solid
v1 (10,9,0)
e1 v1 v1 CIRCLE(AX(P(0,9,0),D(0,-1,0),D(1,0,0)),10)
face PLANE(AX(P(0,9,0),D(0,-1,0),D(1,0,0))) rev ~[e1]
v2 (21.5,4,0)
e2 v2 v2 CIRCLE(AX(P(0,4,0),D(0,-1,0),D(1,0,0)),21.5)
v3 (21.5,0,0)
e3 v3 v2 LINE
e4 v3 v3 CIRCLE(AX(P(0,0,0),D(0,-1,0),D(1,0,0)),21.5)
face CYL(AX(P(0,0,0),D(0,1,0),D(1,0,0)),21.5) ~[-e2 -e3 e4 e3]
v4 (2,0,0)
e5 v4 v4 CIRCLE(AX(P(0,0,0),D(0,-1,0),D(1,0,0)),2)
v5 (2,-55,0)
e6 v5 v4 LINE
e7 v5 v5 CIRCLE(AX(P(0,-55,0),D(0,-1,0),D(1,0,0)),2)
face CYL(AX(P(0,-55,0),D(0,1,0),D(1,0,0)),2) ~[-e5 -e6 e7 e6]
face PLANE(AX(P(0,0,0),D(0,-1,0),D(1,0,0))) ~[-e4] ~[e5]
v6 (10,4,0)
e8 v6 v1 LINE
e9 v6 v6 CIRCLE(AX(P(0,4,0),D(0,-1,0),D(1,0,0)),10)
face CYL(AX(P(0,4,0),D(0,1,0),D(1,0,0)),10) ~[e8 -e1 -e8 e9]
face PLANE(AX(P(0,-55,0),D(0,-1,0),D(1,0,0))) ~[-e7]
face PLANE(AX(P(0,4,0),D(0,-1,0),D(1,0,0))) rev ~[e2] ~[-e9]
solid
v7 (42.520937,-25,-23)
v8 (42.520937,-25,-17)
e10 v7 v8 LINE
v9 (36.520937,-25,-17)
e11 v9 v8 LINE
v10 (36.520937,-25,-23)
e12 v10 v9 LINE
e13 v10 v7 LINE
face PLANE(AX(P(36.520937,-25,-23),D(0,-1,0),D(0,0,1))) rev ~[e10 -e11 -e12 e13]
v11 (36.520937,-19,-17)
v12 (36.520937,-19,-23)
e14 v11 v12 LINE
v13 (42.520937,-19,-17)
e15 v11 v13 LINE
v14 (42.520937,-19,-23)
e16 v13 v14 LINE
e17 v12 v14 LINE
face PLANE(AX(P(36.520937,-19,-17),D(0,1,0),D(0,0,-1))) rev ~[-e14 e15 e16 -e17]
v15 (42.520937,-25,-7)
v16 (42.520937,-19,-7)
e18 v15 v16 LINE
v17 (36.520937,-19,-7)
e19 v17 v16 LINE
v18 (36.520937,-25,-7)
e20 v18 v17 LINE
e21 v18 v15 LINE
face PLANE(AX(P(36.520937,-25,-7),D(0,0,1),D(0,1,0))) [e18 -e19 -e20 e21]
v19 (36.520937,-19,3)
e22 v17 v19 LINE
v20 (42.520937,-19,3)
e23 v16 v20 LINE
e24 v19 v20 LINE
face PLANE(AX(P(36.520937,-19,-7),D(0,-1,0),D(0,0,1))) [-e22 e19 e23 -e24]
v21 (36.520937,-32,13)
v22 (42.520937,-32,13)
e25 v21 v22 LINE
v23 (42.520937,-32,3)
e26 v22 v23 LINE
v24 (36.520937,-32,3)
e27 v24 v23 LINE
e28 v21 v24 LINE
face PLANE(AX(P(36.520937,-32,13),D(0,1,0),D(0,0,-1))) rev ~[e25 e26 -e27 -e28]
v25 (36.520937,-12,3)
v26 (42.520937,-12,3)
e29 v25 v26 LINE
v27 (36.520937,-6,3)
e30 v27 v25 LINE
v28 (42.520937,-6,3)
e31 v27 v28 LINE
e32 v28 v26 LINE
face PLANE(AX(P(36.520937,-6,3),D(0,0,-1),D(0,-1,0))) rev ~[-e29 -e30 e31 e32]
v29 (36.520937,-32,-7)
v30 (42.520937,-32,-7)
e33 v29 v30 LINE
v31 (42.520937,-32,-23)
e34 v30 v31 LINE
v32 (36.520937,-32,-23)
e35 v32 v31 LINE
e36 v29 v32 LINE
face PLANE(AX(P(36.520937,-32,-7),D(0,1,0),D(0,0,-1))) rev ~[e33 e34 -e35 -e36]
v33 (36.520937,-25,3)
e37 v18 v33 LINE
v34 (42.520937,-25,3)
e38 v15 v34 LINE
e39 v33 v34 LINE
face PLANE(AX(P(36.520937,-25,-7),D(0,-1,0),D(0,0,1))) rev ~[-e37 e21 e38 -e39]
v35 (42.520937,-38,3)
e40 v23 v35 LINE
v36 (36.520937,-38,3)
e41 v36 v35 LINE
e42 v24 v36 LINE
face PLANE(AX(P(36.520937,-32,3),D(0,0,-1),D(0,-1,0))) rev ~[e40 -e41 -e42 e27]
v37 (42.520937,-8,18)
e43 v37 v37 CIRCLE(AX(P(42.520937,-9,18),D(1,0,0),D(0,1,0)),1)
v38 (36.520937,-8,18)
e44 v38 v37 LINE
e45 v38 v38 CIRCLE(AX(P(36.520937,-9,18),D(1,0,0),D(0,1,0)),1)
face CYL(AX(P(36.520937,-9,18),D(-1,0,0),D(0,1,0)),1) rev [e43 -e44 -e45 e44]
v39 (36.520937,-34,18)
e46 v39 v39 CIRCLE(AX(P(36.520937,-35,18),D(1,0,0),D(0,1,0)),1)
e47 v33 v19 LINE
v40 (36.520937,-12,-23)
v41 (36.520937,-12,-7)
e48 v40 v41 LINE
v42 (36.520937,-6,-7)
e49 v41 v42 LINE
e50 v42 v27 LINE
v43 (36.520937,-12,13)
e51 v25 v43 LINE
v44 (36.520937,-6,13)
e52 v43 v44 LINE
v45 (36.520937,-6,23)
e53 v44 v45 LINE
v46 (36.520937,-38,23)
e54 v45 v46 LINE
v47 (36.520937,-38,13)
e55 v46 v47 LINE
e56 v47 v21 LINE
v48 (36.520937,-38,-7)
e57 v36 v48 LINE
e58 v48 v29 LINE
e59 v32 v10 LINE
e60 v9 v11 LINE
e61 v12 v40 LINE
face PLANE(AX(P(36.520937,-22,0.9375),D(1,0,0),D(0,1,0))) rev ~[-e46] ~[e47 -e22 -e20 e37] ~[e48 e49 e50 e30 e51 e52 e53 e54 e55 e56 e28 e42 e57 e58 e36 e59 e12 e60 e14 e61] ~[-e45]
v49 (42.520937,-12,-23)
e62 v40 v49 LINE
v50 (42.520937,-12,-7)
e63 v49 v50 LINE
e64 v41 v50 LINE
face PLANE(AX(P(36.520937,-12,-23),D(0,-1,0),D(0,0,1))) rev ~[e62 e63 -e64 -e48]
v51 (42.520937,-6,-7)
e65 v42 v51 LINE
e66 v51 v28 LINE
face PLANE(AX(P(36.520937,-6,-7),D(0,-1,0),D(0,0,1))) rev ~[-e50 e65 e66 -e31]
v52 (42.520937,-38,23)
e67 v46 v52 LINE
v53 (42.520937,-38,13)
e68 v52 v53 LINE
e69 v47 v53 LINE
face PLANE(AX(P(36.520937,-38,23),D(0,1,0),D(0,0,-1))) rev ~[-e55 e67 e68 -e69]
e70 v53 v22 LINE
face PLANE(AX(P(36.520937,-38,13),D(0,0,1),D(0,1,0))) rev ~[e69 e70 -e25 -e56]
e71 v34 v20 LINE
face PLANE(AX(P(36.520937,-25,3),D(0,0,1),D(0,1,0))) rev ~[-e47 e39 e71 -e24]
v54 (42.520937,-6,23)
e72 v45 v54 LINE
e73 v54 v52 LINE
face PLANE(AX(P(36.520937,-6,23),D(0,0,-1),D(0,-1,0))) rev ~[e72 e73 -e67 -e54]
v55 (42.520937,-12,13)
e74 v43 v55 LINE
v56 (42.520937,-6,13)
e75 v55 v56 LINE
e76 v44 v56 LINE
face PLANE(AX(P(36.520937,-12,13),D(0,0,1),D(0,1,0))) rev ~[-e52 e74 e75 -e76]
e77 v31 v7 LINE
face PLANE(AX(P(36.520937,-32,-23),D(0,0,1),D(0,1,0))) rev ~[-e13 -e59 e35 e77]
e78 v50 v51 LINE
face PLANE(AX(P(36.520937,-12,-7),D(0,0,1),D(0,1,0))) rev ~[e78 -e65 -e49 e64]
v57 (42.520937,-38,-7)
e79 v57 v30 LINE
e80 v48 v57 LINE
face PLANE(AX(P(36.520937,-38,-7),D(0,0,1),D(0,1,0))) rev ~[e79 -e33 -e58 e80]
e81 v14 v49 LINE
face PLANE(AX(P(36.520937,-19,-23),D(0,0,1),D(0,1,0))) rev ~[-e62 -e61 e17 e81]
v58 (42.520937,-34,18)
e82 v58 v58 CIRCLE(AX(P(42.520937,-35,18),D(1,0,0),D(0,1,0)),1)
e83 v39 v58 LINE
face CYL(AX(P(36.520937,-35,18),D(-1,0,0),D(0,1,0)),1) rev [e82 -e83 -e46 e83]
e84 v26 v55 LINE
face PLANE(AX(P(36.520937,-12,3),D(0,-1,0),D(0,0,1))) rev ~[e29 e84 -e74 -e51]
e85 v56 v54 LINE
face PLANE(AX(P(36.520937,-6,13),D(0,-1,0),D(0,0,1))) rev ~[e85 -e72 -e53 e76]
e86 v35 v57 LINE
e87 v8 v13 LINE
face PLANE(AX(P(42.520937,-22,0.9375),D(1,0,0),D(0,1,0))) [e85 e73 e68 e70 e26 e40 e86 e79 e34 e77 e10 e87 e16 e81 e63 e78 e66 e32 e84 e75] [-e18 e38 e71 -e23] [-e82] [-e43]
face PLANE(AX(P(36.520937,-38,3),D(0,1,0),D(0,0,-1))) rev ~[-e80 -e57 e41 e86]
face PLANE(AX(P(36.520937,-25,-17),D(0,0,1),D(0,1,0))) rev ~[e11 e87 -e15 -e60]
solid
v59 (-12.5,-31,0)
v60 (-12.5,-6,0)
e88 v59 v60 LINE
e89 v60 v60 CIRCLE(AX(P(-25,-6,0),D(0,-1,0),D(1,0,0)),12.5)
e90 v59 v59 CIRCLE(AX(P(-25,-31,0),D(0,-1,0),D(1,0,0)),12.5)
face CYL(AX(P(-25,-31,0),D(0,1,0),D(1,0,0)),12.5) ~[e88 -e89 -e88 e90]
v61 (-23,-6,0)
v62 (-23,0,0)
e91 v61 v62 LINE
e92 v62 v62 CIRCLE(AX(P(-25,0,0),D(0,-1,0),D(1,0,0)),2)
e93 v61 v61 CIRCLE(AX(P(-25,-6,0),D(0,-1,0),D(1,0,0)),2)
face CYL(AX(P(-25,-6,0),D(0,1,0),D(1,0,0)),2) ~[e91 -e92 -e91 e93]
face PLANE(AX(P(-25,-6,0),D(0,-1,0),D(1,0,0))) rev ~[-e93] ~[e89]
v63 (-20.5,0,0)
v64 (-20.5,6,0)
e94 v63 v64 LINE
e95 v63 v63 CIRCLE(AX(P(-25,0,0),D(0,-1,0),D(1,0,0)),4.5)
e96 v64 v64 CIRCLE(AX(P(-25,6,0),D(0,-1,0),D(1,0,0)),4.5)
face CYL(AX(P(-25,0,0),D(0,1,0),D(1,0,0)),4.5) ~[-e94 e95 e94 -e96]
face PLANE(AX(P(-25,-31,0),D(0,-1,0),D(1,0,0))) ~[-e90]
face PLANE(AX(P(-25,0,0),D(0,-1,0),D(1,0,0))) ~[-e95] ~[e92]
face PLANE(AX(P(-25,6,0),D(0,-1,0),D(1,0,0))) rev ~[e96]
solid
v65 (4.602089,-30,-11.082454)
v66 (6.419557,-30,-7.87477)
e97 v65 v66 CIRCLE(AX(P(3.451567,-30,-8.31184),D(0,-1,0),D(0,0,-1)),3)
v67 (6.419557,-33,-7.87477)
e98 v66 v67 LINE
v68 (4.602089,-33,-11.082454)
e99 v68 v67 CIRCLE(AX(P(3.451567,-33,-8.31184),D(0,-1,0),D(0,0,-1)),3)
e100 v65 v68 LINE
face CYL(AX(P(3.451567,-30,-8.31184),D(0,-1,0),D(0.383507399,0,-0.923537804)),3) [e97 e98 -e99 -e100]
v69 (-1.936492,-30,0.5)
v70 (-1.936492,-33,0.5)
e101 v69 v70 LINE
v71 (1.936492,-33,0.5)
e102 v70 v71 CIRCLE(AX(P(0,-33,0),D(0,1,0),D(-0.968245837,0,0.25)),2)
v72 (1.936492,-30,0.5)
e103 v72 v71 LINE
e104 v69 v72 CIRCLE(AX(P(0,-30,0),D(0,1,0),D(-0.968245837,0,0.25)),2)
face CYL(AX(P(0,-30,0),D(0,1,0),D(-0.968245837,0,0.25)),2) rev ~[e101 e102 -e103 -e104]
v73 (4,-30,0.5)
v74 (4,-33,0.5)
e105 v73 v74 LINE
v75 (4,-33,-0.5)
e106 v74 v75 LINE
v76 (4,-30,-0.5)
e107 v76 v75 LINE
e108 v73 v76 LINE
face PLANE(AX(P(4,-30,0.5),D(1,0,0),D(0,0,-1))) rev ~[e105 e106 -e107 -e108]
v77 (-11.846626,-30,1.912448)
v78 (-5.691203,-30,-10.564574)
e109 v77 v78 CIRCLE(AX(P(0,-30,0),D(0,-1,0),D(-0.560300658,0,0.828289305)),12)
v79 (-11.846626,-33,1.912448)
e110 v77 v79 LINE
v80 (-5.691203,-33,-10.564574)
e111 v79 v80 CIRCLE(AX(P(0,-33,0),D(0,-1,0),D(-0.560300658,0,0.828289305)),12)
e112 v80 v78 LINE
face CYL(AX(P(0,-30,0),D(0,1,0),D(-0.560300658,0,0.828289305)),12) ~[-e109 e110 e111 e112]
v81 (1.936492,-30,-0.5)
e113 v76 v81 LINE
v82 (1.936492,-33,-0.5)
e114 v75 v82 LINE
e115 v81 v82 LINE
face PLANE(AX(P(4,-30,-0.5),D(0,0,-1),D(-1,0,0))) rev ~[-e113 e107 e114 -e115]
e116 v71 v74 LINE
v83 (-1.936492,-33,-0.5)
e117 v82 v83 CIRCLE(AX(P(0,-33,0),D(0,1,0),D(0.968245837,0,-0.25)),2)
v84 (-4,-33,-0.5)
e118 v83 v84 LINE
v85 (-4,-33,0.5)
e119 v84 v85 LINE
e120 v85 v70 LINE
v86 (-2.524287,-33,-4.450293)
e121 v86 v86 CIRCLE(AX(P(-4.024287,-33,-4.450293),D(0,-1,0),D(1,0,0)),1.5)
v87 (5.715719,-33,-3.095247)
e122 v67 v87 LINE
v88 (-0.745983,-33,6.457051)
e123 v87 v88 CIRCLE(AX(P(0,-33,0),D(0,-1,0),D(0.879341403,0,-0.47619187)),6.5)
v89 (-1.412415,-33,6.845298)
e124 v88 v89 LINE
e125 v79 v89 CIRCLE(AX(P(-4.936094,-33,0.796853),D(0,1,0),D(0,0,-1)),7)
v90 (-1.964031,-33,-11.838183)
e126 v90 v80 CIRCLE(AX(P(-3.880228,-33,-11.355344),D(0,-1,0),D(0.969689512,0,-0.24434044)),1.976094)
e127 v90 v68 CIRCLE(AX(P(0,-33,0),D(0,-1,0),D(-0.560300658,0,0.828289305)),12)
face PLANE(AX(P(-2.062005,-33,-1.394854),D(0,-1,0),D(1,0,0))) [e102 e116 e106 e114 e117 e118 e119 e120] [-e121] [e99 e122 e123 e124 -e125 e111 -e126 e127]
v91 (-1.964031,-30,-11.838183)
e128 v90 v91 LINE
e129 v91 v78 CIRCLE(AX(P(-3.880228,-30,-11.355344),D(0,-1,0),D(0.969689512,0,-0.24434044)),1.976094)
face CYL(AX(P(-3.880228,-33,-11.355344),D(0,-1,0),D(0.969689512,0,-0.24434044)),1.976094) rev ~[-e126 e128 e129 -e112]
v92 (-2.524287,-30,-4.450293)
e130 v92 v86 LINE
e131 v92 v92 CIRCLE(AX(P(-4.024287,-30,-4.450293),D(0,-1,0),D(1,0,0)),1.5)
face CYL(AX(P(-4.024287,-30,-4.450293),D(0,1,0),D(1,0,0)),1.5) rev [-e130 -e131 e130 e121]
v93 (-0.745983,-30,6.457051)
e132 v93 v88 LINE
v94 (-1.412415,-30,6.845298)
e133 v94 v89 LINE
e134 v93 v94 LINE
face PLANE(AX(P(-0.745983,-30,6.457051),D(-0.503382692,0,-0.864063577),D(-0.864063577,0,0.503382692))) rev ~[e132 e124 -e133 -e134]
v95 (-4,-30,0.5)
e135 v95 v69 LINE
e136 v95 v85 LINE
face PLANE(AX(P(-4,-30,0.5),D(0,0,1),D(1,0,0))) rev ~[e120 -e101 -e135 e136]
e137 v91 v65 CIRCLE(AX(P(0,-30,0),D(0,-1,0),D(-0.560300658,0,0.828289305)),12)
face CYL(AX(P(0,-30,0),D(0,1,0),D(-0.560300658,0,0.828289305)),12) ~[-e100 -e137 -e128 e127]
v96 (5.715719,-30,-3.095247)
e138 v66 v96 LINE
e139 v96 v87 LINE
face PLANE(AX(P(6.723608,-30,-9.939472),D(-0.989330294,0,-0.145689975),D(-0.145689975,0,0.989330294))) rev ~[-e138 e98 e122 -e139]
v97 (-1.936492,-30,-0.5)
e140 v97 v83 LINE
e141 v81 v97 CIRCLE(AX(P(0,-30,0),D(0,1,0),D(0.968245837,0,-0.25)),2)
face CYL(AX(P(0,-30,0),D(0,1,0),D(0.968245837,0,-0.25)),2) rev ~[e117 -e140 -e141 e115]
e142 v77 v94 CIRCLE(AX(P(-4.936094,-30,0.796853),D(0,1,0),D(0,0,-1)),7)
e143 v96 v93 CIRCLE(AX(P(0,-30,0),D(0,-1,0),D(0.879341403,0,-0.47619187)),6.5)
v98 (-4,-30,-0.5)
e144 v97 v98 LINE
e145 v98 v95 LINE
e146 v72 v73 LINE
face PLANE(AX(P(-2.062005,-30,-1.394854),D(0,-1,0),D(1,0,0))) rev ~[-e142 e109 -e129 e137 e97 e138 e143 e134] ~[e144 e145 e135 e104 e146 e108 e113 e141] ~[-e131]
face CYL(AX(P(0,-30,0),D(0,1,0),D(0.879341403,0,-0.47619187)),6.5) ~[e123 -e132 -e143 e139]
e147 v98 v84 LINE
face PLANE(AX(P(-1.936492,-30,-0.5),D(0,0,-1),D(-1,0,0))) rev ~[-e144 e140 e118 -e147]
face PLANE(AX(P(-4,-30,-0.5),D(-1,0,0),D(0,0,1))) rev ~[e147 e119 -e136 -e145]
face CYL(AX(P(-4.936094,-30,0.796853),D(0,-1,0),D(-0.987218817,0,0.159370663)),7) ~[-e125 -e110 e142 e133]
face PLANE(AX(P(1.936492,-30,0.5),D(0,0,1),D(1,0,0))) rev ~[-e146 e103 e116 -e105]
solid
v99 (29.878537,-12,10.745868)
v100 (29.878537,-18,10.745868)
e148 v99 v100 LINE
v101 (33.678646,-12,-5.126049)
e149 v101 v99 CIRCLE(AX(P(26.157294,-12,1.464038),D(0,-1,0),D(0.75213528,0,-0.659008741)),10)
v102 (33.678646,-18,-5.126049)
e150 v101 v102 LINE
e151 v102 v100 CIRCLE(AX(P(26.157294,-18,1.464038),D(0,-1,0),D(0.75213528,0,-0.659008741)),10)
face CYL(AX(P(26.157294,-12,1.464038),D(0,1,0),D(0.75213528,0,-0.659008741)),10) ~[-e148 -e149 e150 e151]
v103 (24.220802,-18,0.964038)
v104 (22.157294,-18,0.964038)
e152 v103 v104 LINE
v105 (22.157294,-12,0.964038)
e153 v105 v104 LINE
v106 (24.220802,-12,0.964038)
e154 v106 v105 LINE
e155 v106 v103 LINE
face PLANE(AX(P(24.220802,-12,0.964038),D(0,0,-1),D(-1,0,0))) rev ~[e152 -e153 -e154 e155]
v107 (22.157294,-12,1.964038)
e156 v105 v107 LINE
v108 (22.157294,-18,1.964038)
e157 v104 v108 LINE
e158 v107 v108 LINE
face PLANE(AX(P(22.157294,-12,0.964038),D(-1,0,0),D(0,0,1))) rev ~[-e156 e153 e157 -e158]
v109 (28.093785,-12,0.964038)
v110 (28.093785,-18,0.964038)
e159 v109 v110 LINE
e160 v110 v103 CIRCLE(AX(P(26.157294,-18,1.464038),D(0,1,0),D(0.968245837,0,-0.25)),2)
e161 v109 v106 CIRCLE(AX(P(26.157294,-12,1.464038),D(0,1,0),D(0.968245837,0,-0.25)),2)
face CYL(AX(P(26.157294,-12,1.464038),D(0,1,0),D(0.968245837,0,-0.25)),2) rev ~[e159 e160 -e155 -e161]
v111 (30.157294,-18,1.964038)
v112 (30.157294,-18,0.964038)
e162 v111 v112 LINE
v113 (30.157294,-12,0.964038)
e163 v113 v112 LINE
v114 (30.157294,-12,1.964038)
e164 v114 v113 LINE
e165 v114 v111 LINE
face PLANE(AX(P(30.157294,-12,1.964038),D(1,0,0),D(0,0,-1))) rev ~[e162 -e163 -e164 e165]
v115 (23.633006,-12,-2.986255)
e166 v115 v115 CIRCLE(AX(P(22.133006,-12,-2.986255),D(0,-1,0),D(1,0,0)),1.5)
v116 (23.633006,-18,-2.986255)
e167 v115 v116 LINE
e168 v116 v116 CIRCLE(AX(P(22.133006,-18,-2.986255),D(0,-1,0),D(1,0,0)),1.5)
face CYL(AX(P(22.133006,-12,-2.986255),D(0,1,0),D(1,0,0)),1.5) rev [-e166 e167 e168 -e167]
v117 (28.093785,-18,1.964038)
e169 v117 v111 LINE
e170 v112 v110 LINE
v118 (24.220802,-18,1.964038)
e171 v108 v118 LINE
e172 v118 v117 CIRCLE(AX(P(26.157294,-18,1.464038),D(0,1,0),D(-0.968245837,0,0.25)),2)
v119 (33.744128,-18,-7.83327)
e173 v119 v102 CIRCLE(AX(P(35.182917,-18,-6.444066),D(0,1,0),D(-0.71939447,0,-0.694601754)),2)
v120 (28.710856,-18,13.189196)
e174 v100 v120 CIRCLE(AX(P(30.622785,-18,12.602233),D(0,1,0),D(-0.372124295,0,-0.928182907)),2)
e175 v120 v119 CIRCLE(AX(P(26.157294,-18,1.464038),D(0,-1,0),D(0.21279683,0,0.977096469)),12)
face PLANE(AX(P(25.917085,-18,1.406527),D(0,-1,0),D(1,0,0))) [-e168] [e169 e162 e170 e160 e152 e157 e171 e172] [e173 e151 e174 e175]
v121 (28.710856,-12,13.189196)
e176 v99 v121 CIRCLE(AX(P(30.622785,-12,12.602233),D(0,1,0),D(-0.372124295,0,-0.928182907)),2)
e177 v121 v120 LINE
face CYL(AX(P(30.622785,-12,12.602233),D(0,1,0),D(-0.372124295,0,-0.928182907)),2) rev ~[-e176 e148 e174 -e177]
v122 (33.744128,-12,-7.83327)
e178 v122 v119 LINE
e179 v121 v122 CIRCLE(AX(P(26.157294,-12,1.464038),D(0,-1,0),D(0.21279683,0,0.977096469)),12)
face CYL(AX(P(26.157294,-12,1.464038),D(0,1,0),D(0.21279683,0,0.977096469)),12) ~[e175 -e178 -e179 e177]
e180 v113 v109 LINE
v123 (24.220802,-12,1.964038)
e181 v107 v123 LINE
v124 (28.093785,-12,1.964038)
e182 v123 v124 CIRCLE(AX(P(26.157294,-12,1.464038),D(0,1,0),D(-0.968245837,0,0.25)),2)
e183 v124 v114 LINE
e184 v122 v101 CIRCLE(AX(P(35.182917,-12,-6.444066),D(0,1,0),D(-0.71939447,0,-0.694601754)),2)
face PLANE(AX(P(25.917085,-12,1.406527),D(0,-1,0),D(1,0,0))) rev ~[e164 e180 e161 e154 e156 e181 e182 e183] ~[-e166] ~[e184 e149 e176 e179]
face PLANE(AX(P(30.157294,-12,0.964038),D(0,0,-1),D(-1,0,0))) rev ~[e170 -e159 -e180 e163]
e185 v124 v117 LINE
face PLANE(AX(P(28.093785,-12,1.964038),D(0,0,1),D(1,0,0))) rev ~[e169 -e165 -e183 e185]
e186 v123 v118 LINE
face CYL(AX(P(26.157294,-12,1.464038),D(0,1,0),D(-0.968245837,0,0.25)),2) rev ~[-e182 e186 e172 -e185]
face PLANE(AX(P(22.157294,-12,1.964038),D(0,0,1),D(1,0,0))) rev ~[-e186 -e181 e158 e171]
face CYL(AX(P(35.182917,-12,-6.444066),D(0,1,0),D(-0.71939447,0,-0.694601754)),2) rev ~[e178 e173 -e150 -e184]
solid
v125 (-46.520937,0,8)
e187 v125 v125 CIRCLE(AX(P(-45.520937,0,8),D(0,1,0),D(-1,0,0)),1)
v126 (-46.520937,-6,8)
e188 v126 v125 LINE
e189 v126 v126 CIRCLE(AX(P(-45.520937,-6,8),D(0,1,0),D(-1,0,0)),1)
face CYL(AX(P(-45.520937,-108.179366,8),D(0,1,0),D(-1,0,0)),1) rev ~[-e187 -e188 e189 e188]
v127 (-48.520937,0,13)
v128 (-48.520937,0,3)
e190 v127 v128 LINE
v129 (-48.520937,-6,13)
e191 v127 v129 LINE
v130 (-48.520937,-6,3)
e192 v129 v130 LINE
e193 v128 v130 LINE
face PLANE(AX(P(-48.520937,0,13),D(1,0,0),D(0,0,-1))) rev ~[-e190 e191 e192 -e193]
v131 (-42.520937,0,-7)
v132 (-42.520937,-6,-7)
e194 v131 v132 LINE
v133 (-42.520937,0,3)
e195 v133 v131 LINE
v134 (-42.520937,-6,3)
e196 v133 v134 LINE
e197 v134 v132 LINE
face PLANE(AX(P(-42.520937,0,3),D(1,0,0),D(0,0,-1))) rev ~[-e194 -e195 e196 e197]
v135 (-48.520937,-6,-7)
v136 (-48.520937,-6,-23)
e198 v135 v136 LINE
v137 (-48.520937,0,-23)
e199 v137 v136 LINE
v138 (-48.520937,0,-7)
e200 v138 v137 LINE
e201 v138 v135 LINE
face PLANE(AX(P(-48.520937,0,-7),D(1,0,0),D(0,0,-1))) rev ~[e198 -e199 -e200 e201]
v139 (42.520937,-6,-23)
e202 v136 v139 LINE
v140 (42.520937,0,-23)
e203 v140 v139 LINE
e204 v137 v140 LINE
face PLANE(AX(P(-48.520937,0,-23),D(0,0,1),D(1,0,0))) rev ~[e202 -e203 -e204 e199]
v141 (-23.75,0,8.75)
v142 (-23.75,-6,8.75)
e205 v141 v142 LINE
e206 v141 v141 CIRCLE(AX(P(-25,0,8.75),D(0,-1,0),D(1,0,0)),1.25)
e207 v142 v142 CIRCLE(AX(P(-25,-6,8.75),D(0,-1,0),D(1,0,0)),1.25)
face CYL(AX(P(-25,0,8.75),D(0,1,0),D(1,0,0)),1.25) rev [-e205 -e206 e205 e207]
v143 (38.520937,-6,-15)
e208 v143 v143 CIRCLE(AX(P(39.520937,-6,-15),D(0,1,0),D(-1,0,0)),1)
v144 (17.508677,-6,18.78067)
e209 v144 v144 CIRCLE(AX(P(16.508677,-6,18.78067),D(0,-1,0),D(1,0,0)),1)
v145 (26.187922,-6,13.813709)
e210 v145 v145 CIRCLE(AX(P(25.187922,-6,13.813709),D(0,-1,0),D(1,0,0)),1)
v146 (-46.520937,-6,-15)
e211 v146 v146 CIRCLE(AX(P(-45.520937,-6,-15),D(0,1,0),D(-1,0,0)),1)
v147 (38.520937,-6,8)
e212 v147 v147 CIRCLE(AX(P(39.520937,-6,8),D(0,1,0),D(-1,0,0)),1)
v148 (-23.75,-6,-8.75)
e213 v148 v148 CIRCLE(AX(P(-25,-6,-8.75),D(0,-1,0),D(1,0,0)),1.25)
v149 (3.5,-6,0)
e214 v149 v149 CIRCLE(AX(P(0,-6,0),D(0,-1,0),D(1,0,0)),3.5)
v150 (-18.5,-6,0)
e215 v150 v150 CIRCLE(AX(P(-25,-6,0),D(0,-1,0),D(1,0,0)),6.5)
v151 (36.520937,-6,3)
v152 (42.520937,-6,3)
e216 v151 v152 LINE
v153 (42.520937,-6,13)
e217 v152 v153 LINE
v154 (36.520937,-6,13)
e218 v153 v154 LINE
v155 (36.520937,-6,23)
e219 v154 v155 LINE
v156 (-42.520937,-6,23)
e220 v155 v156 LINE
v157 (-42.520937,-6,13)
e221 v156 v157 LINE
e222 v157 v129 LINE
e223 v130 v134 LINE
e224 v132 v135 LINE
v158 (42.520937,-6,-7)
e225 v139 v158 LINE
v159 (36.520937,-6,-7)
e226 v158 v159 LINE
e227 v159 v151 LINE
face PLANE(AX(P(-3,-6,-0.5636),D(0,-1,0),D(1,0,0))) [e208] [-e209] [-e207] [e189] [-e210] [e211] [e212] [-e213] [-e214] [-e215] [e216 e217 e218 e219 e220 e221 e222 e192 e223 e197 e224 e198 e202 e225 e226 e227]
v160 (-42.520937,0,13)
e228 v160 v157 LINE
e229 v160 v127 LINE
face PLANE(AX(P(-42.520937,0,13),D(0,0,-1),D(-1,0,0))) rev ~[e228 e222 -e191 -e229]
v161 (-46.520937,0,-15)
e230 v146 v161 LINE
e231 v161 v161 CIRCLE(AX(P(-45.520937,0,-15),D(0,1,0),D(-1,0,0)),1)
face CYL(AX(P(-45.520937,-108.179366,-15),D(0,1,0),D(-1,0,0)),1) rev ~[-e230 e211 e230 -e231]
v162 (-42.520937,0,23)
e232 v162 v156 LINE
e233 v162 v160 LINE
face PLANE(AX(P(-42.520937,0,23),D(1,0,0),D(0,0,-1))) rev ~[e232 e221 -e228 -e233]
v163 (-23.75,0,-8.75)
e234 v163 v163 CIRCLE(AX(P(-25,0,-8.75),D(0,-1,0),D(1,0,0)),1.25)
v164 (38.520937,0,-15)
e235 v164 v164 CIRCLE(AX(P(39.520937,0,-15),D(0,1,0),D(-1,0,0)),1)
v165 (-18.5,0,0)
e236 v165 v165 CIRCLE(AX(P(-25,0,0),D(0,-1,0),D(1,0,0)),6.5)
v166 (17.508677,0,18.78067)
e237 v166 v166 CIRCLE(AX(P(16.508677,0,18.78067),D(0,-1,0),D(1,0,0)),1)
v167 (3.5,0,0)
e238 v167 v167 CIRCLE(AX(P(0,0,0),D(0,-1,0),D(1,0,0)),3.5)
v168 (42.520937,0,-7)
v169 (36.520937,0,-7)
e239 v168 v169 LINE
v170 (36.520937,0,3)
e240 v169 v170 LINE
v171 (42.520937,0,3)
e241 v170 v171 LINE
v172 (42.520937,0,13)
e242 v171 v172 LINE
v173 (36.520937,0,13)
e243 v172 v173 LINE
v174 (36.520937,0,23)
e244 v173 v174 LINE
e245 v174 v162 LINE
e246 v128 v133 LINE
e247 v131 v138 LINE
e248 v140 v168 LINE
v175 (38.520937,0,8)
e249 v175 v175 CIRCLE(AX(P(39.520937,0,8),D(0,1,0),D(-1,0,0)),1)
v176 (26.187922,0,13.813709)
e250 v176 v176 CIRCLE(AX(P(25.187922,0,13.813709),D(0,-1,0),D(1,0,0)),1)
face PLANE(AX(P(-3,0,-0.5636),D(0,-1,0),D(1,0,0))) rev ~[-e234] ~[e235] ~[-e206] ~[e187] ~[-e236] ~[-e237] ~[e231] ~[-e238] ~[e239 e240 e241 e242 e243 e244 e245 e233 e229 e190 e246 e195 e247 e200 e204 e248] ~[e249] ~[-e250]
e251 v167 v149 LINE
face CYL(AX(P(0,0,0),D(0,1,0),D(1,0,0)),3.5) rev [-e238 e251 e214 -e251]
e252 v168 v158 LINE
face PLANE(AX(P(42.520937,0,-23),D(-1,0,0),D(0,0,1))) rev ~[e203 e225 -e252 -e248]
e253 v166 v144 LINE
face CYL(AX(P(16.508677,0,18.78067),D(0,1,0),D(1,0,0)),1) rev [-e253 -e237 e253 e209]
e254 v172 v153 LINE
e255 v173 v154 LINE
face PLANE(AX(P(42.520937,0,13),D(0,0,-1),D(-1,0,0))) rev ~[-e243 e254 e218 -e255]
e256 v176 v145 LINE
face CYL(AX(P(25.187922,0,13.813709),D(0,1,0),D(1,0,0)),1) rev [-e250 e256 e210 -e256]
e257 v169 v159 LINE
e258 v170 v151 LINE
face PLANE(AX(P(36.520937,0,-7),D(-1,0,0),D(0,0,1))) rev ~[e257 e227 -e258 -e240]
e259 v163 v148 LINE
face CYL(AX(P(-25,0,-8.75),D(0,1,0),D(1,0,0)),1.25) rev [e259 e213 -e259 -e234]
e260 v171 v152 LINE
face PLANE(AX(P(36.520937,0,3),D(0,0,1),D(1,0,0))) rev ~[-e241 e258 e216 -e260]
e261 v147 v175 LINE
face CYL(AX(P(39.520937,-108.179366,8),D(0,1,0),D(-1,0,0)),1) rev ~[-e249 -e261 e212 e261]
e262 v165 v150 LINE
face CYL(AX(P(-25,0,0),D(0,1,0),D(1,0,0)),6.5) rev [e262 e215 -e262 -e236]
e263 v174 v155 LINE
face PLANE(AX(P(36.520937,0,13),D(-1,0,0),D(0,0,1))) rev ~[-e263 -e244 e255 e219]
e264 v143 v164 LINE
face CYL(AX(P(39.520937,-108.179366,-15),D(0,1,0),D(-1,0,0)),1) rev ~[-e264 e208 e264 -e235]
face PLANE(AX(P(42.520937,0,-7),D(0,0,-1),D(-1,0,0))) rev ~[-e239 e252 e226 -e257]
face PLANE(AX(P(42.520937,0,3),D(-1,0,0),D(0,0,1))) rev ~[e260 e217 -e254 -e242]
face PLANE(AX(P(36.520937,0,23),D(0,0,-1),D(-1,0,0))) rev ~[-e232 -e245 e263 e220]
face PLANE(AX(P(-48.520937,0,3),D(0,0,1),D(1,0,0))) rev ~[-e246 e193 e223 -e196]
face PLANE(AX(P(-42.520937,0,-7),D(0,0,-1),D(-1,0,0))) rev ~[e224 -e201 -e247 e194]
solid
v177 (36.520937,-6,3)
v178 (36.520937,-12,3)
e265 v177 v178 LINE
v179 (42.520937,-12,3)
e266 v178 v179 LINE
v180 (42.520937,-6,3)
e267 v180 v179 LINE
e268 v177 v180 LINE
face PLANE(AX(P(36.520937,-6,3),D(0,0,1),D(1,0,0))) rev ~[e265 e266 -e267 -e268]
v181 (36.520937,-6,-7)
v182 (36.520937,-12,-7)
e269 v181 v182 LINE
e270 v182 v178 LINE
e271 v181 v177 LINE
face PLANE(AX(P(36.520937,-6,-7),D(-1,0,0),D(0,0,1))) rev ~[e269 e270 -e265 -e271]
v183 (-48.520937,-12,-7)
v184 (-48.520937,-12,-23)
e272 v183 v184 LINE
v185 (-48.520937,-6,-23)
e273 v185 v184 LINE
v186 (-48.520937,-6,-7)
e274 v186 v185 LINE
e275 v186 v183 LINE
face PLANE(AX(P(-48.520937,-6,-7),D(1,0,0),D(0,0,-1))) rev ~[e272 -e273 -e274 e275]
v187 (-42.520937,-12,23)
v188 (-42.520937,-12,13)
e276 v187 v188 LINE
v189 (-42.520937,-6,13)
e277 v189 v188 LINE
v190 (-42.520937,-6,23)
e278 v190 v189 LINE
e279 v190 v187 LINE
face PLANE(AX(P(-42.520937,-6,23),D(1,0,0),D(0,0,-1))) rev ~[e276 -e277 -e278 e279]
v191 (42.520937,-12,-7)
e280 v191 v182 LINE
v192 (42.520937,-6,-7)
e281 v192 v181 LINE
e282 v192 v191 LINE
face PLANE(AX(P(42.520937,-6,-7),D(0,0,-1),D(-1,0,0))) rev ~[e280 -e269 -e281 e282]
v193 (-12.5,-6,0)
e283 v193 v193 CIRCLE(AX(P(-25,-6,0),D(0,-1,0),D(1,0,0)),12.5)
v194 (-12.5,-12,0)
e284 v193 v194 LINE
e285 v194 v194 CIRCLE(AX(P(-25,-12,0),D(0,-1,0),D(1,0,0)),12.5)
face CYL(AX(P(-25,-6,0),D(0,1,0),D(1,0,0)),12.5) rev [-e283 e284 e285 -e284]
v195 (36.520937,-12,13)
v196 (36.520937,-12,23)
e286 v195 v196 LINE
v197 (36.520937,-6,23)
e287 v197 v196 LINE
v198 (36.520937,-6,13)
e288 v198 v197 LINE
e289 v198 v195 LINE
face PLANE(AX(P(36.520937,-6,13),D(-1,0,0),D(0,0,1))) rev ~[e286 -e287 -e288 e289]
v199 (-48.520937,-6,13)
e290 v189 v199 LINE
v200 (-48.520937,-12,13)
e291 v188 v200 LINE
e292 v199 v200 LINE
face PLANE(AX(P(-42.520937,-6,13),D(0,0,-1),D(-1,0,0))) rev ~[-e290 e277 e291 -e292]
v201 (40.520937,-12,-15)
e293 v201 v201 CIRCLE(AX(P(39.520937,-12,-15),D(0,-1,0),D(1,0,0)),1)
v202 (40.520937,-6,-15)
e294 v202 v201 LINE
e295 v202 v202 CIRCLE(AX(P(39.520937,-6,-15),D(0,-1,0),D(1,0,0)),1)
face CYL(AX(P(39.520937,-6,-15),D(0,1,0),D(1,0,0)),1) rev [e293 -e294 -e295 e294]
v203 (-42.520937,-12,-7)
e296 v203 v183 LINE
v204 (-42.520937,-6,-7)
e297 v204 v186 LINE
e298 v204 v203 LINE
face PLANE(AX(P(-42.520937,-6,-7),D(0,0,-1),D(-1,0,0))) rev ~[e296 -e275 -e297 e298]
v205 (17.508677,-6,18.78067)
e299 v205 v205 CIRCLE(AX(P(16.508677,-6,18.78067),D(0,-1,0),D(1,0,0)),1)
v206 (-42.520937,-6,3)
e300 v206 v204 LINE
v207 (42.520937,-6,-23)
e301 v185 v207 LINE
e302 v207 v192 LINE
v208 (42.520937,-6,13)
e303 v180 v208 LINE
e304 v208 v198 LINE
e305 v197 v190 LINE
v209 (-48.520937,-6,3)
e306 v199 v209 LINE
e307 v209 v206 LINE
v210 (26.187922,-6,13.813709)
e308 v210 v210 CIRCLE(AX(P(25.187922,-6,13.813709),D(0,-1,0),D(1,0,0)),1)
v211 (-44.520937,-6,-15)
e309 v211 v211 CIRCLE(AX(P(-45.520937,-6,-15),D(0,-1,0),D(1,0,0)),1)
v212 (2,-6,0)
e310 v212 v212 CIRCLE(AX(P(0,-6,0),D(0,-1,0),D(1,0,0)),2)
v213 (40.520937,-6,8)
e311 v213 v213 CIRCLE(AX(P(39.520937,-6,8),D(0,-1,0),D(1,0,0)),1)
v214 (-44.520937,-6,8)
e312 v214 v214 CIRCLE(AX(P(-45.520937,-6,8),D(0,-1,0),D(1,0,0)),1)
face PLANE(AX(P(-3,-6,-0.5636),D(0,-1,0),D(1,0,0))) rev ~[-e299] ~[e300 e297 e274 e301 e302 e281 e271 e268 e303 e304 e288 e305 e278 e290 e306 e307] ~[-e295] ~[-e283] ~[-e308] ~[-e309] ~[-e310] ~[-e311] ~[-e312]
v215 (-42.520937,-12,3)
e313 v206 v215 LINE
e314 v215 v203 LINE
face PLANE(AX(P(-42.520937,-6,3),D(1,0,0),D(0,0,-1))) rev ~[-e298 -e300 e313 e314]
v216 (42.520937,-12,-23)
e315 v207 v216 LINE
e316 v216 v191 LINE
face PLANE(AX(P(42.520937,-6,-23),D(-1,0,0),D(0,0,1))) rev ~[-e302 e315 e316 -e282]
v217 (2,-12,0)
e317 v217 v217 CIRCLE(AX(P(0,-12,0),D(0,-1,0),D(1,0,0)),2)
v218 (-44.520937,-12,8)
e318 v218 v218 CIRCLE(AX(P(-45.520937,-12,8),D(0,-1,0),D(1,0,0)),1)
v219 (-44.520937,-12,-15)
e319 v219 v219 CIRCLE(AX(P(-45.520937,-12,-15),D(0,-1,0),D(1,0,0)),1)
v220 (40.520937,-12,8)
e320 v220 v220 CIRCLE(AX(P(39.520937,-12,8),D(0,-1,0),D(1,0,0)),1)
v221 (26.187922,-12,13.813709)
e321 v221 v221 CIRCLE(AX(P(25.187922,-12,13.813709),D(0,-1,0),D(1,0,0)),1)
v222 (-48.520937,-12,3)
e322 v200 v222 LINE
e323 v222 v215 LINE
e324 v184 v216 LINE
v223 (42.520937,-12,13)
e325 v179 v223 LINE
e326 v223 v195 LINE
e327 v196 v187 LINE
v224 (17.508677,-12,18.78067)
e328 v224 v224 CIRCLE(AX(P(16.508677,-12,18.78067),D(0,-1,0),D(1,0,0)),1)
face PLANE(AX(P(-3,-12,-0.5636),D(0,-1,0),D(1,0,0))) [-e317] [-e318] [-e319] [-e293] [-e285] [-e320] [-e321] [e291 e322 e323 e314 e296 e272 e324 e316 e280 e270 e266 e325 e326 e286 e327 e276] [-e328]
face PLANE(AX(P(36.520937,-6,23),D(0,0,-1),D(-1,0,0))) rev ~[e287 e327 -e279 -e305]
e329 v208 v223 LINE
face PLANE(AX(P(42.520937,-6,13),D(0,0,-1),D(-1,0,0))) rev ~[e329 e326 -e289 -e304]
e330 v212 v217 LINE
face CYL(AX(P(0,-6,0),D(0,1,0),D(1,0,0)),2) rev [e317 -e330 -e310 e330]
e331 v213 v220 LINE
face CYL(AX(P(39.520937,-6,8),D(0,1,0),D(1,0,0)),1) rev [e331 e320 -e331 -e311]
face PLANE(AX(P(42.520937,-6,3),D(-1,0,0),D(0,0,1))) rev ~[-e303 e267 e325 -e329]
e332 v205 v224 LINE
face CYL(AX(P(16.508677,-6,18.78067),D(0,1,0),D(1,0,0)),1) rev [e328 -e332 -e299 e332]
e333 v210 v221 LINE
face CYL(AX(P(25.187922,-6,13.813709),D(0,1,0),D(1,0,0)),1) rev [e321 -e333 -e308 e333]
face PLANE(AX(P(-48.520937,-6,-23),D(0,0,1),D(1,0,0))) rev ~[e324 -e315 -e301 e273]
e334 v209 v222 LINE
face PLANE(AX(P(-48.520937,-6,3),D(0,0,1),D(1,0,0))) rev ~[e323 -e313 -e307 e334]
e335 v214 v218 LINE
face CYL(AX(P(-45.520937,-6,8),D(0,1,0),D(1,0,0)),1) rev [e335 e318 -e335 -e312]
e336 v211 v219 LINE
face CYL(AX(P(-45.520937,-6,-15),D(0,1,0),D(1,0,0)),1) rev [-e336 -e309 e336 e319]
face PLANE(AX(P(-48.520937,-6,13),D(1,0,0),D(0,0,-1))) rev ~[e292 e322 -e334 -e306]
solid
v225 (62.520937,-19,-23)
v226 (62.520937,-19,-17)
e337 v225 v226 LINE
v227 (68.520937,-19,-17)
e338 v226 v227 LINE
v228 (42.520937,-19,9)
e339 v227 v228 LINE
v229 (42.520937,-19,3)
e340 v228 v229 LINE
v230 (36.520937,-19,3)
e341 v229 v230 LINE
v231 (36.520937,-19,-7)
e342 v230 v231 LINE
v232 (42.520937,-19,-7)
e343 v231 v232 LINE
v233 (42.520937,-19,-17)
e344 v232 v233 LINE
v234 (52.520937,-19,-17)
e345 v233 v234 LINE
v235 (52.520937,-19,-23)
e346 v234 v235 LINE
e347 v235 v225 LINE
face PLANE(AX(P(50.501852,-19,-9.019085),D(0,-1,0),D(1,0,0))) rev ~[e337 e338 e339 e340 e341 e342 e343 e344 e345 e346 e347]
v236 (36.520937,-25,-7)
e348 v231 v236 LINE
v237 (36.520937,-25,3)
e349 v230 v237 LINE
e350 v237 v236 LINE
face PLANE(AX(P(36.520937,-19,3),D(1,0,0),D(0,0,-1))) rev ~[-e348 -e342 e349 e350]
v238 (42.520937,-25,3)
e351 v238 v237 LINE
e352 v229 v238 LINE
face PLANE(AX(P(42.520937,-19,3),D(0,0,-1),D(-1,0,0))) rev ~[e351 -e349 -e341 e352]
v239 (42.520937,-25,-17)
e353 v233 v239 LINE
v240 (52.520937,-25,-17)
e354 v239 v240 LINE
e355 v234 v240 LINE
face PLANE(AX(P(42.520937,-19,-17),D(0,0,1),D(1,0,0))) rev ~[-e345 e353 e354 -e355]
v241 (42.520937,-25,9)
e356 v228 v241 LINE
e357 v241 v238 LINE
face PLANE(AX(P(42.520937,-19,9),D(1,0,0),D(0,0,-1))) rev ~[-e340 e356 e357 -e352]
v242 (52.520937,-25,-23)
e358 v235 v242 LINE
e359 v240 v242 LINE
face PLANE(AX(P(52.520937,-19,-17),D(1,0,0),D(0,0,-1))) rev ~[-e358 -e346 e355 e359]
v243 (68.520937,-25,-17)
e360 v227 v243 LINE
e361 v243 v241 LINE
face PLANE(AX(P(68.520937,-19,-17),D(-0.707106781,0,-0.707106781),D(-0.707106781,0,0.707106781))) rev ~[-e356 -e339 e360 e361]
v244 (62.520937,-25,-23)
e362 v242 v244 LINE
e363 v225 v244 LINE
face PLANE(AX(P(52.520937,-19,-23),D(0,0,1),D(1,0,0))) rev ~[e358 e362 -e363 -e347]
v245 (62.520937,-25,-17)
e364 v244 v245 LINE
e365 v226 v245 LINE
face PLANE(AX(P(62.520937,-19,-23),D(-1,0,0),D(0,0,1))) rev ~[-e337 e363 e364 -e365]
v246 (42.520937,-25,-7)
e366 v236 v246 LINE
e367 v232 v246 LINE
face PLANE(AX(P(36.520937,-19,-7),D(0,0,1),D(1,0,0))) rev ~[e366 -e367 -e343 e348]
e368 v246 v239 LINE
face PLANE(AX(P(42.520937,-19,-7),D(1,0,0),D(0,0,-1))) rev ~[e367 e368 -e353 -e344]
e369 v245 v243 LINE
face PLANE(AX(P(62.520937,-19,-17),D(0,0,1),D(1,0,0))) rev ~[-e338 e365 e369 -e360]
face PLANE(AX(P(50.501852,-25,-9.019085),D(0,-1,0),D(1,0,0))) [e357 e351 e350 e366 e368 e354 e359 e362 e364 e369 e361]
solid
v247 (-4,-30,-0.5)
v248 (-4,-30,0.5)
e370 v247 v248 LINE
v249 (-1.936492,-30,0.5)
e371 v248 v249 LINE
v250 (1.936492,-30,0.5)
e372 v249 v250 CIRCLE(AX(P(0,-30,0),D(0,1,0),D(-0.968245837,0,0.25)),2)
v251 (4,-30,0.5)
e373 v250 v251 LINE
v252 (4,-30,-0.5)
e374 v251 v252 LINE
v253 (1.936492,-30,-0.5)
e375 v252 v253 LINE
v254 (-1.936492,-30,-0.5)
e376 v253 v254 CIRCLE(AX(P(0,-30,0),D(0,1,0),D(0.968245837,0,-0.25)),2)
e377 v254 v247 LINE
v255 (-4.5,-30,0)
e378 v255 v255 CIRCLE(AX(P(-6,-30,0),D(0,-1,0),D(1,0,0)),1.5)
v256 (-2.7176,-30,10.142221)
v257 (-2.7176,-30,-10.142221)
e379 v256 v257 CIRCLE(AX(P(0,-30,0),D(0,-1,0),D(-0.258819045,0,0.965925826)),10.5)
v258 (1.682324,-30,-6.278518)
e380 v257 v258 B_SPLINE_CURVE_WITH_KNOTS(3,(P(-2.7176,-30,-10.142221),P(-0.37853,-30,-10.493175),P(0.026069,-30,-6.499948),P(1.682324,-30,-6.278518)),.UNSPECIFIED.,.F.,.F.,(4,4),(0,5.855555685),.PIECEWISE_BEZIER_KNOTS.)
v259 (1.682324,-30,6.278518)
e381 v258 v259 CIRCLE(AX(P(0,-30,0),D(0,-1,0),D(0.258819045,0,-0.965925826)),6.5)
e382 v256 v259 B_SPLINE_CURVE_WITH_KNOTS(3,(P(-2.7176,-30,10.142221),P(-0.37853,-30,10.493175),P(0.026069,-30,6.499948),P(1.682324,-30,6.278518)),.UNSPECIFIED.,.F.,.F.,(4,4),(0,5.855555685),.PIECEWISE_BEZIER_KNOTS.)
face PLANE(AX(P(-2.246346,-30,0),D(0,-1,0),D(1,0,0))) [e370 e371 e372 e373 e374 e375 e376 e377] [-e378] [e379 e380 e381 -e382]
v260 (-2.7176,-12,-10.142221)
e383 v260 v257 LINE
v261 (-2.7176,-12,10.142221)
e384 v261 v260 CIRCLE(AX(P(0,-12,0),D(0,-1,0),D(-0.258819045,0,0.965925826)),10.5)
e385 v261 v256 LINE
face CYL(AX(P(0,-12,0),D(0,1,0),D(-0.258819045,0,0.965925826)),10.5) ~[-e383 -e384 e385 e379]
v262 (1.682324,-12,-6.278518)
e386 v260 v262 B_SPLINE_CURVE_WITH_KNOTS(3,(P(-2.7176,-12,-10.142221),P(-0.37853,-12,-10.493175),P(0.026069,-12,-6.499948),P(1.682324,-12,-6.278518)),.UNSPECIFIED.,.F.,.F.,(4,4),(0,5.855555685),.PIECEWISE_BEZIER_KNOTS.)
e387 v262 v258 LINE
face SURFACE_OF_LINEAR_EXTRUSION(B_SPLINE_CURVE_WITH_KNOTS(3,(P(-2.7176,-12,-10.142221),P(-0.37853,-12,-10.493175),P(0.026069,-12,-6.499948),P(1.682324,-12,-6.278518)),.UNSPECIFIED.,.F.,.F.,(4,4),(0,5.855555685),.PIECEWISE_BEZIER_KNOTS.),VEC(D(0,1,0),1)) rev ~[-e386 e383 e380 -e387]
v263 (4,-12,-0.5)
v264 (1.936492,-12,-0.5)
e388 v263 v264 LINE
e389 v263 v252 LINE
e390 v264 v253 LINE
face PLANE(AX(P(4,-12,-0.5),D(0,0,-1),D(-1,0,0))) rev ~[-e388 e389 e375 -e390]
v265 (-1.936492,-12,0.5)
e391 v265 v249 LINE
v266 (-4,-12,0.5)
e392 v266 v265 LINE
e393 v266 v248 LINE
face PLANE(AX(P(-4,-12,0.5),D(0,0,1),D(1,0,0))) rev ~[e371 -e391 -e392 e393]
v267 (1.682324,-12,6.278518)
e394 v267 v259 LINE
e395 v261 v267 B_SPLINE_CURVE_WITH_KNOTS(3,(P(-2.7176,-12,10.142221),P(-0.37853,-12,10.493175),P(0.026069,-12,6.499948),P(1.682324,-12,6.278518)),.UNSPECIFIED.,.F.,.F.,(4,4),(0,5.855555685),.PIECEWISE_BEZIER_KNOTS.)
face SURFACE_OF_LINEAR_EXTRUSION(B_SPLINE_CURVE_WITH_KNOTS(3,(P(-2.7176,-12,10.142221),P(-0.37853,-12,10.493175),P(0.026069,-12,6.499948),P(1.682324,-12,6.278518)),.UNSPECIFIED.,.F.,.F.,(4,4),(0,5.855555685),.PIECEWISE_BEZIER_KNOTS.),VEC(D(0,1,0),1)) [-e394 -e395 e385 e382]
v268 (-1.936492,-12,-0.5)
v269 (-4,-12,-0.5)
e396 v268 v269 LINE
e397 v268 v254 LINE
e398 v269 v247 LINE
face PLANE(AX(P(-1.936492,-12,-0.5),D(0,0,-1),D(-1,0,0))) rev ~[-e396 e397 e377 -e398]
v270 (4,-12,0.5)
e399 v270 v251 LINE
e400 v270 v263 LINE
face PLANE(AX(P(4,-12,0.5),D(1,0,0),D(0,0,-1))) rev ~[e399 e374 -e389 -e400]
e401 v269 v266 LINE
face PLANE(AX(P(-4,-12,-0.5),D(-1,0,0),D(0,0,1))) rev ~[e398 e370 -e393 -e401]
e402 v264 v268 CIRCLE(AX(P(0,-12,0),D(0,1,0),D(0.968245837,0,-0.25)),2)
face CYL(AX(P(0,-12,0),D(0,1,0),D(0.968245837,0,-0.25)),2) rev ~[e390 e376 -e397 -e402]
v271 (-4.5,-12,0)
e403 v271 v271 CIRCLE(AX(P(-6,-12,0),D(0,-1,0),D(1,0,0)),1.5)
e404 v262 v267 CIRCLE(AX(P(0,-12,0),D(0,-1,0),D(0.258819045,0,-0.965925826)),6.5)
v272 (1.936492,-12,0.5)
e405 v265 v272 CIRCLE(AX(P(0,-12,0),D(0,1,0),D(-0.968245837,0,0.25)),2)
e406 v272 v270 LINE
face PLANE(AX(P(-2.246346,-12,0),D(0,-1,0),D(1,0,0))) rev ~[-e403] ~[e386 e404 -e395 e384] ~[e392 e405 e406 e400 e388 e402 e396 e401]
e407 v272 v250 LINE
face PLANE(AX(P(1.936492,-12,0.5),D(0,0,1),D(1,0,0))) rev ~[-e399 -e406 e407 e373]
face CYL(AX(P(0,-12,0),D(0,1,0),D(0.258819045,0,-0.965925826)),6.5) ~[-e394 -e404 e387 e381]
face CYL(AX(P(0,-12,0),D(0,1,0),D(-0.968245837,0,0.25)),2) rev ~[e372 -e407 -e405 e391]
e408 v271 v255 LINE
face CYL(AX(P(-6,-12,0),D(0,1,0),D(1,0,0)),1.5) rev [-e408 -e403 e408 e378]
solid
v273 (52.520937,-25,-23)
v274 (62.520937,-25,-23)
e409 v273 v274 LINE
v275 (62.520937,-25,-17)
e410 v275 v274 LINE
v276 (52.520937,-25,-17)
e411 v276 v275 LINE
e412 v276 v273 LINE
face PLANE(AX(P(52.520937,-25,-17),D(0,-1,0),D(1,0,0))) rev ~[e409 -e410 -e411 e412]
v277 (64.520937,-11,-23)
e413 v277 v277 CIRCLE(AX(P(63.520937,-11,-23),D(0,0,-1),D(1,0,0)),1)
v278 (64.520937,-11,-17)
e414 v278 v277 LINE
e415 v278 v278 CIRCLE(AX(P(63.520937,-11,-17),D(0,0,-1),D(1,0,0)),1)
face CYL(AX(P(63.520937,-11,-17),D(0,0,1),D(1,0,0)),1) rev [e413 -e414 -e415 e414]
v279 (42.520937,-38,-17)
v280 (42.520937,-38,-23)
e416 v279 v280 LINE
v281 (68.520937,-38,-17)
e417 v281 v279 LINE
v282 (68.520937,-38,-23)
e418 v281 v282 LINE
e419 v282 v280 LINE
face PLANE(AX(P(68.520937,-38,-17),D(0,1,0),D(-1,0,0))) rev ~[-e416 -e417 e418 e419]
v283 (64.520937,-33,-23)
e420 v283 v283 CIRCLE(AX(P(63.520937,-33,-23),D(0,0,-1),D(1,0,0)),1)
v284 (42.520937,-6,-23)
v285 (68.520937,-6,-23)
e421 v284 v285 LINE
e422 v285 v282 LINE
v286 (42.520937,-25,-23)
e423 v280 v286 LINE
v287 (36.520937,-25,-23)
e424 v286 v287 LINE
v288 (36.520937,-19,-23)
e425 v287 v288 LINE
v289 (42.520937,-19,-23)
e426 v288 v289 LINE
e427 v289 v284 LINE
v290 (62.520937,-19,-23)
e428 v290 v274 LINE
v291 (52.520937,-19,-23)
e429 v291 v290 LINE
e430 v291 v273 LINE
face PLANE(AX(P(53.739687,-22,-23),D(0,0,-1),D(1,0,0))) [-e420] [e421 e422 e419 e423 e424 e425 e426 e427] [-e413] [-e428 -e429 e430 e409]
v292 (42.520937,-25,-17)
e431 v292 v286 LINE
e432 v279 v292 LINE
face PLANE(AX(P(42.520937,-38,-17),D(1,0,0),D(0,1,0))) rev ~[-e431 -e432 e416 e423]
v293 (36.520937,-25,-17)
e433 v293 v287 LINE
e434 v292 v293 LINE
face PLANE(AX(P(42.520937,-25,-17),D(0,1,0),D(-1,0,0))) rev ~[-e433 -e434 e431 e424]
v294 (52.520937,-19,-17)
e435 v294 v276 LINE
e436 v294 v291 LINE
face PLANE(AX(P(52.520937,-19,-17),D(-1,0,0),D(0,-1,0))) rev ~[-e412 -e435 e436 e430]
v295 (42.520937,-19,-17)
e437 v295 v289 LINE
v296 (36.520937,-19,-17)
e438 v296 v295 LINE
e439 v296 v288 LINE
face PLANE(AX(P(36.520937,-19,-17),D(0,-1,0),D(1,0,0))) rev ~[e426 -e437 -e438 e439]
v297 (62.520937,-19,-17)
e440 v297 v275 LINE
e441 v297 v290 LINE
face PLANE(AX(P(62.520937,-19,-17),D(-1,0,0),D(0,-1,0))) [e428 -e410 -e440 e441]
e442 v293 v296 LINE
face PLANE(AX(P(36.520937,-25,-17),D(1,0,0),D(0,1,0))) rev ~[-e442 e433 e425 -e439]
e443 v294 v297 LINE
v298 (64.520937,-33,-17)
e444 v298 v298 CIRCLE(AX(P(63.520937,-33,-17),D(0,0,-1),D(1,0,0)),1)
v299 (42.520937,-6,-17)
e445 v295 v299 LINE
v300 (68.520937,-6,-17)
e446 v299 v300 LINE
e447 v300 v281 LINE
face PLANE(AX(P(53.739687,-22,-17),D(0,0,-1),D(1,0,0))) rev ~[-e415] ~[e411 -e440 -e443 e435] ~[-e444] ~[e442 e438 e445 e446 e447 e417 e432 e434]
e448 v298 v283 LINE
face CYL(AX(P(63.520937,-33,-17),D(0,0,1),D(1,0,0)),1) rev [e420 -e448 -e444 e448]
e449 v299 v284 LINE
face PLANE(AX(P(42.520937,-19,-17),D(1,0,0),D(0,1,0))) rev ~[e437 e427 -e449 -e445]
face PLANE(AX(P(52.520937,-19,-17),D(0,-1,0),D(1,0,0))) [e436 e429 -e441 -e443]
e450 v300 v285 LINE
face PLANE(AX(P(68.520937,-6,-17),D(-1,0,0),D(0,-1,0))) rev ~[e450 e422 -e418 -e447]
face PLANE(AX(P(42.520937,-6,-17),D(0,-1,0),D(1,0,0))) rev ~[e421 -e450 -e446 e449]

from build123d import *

# Parameters (mm, degrees)
F0_R      = 1.25
F0_R_2    = 6.5
F0_R_3    = 3.5
F0_R_4    = 1
F1_DEPTH  = 6
F6_R      = 1
F6_R_2    = 12.5
F6_R_3    = 2
F7_DEPTH  = 6
F8_D      = 2
F9_R      = 1.5
F10_DEPTH = 18
F11_W     = 6
F11_H     = 10
F11_R     = 1
F12_DEPTH = 6
F13_R     = 1
F13_W     = 10
F13_H     = 6
F14_DEPTH = 6
F16_DEPTH = 6
F17_R     = 1.5
F18_DEPTH = 3
F19_R     = 3
F20_R     = 7
F22_DEPTH = 42.001
F23_R     = 1.5
F24_DEPTH = 6


with BuildPart() as f1:
    # F0 (on Front) → F1 (new body)
    with BuildSketch(Plane.XZ):
        Polygon((36.5209371471, 13), (36.5209371471, 23), (-42.5209371471, 23), (-42.5209371471, 13), (-48.5209371471, 13), (-48.5209371471, 3), (-42.5209371471, 3), (-42.5209371471, -7), (-48.5209371471, -7), (-48.5209371471, -23), (42.5209371471, -23), (42.5209371471, -7), (36.5209371471, -7), (36.5209371471, 3), (42.5209371471, 3), (42.5209371471, 13), align=None)
        with Locations((-25, -8.75)):
            Circle(F0_R, mode=Mode.SUBTRACT)
        with Locations((-25, 0)):
            Circle(F0_R_2, mode=Mode.SUBTRACT)
        with Locations((-25, 8.75)):
            Circle(F0_R, mode=Mode.SUBTRACT)
        Circle(F0_R_3, mode=Mode.SUBTRACT)
        with Locations((16.5086770278, 18.7806704564)):
            Circle(F0_R_4, mode=Mode.SUBTRACT)
        with Locations((25.1879223108, 13.8137094824)):
            Circle(F0_R_4, mode=Mode.SUBTRACT)
    extrude(amount=F1_DEPTH)

    # F8 (through all)
    with Locations(Plane.XZ.offset(6)):
        with Locations((39.5209371471, 8), (39.5209371471, -15), (-45.5209371471, -15), (-45.5209371471, 8)):
            Hole(F8_D / 2)


with BuildPart() as f3:
    # F2 (on Top) → F3 (revolve)
    with BuildSketch(Plane.XY):
        Polygon((10, 9), (0, 9), (0, -55), (2, -55), (2, 0), (21.5, 0), (21.5, 4), (10, 4), align=None)
    revolve(axis=Axis((0, -23, 0), (0, -1, 0)))


with BuildPart() as f5:
    # F4 (on Top) → F5 (revolve)
    with BuildSketch(Plane.XY):
        Polygon((-25, -31), (-12.5, -31), (-12.5, -6), (-23, -6), (-23, 0), (-20.5, 0), (-20.5, 6), (-25, 6), align=None)
    revolve(axis=Axis((-25, -12.5, 0), (0, -1, 0)))


with BuildPart() as f7:
    # F6 (on face) → F7 (new body)
    with BuildSketch(Plane.XZ.offset(6)):
        Polygon((36.5209371471, 13), (36.5209371471, 23), (-42.5209371471, 23), (-42.5209371471, 13), (-48.5209371471, 13), (-48.5209371471, 3), (-42.5209371471, 3), (-42.5209371471, -7), (-48.5209371471, -7), (-48.5209371471, -23), (42.5209371471, -23), (42.5209371471, -7), (36.5209371471, -7), (36.5209371471, 3), (42.5209371471, 3), (42.5209371471, 13), align=None)
        with Locations((-45.5209371471, -15)):
            Circle(F6_R, mode=Mode.SUBTRACT)
        with Locations((39.5209371471, -15)):
            Circle(F6_R, mode=Mode.SUBTRACT)
        with Locations((-45.5209371471, 8)):
            Circle(F6_R, mode=Mode.SUBTRACT)
        with Locations((-25, 0)):
            Circle(F6_R_2, mode=Mode.SUBTRACT)
        Circle(F6_R_3, mode=Mode.SUBTRACT)
        with Locations((39.5209371471, 8)):
            Circle(F6_R, mode=Mode.SUBTRACT)
        with Locations((16.5086770278, 18.7806704564)):
            Circle(F6_R, mode=Mode.SUBTRACT)
        with Locations((25.1879223108, 13.8137094824)):
            Circle(F6_R, mode=Mode.SUBTRACT)
    extrude(amount=F7_DEPTH)


with BuildPart() as f10:
    # F9 (on face) → F10 (new body)
    with BuildSketch(Plane.XZ.offset(12)):
        with BuildLine():
            add(Edge.make_bspline(
                [(-2.7175999736, -10.142221176), (-0.3785296212, -10.493174702), (0.0260690487, -6.4999477232), (1.6823237932, -6.2785178709)],
                knots=[0, 0, 0, 0, 5.8555556853, 5.8555556853, 5.8555556853, 5.8555556853], degree=3))
            ThreePointArc((1.6823237932, -6.2785178709), (6.5, 0), (1.6823237932, 6.2785178709))
            add(Edge.make_bspline(
                [(-2.7175999736, 10.142221176), (-0.3785296212, 10.493174702), (0.0260690487, 6.4999477232), (1.6823237932, 6.2785178709)],
                knots=[0, 0, 0, 0, 5.8555556853, 5.8555556853, 5.8555556853, 5.8555556853], degree=3))
            ThreePointArc((-2.7175999736, 10.142221176), (-10.5, 0), (-2.7175999736, -10.142221176))
        make_face()
        with Locations((-6, 0)):
            Circle(F9_R, mode=Mode.SUBTRACT)
        with BuildLine():
            ThreePointArc((1.9364916731, -0.5), (0, -2), (-1.9364916731, -0.5))
            Line((-1.9364916731, -0.5), (-4, -0.5))
            Line((-4, -0.5), (-4, 0.5))
            Line((-4, 0.5), (-1.9364916731, 0.5))
            ThreePointArc((-1.9364916731, 0.5), (0, 2), (1.9364916731, 0.5))
            Line((1.9364916731, 0.5), (4, 0.5))
            Line((4, 0.5), (4, -0.5))
            Line((4, -0.5), (1.9364916731, -0.5))
        make_face(mode=Mode.SUBTRACT)
    extrude(amount=F10_DEPTH)


with BuildPart() as f12:
    # F11 (on face) → F12 (new body)
    with BuildSketch(Plane.YZ.offset(36.5209371471)):
        Polygon((-6, 13), (-6, 23), (-22, 23), (-38, 23), (-38, 13), (-32, 13), (-32, 3), (-38, 3), (-38, -7), (-32, -7), (-32, -23), (-25, -23), (-25, -17), (-22, -17), (-19, -17), (-19, -23), (-12, -23), (-12, -7), (-6, -7), (-6, 3), (-12, 3), (-12, 13), align=None)
        with Locations((-22, -2)):
            Rectangle(F11_W, F11_H, mode=Mode.SUBTRACT)
        with Locations((-35, 18)):
            Circle(F11_R, mode=Mode.SUBTRACT)
        with Locations((-9, 18)):
            Circle(F11_R, mode=Mode.SUBTRACT)
    extrude(amount=F12_DEPTH)


with BuildPart() as f14:
    # F13 (on face) → F14 (new body)
    with BuildSketch(Plane(origin=(0, 0, -17), x_dir=(1, 0, 0), z_dir=(0, 0, -1))):
        Polygon((42.5209371471, 38), (42.5209371471, 25), (36.5209371471, 25), (36.5209371471, 19), (42.5209371471, 19), (42.5209371471, 6), (68.5209371471, 6), (68.5209371471, 38), align=None)
        with Locations((63.5209371471, 11)):
            Circle(F13_R, mode=Mode.SUBTRACT)
        with Locations((57.5209371471, 22)):
            Rectangle(F13_W, F13_H, mode=Mode.SUBTRACT)
        with Locations((63.5209371471, 33)):
            Circle(F13_R, mode=Mode.SUBTRACT)
    extrude(amount=F14_DEPTH)


with BuildPart() as f16:
    # F15 (on face) → F16 (new body)
    with BuildSketch(Plane.XZ.offset(19)):
        Polygon((62.5209371471, -17), (68.5209371471, -17), (42.5209371471, 9), (42.5209371471, 3), (36.5209371471, 3), (36.5209371471, -7), (42.5209371471, -7), (42.5209371471, -17), (52.5209371471, -17), (52.5209371471, -23), (62.5209371471, -23), align=None)
    extrude(amount=F16_DEPTH)


with BuildPart() as f18:
    # F17 (on face) → F18 (new body)
    with BuildSketch(Plane.XZ.offset(30)):
        with BuildLine():
            Line((-0.7459832887, 6.4570511019), (-6.7236078935, 9.9394716607))
            ThreePointArc((-6.7236078935, 9.9394716607), (-9.9394716607, -6.7236078935), (6.7236078935, -9.9394716607))
            Line((6.7236078935, -9.9394716607), (5.7157191191, -3.0952471552))
            ThreePointArc((5.7157191191, -3.0952471552), (5.3838804829, 3.6419542756), (-0.7459832887, 6.4570511019))
        make_face()
        with Locations((-4.0242874639, -4.4502932946)):
            Circle(F17_R, mode=Mode.SUBTRACT)
        with BuildLine():
            Line((-4, -0.5), (-4, 0.5))
            Line((-4, 0.5), (-1.9364916731, 0.5))
            ThreePointArc((-1.9364916731, 0.5), (0, 2), (1.9364916731, 0.5))
            Line((1.9364916731, 0.5), (4, 0.5))
            Line((4, 0.5), (4, -0.5))
            Line((4, -0.5), (1.9364916731, -0.5))
            ThreePointArc((1.9364916731, -0.5), (0, -2), (-1.9364916731, -0.5))
            Line((-1.9364916731, -0.5), (-4, -0.5))
        make_face(mode=Mode.SUBTRACT)
    extrude(amount=F18_DEPTH)

    # F19
    f19_edges = [f18.edges().sort_by_distance(p)[0] for p in [
        (6.723608, -31.5, -9.939472),
    ]]
    fillet(f19_edges, radius=F19_R)

    # F20
    f20_edges = [f18.edges().sort_by_distance(p)[0] for p in [
        (-6.723608, -31.5, 9.939472),
    ]]
    fillet(f20_edges, radius=F20_R)

    # F21 (on face) → F22 (cut, through all)
    with BuildSketch(Plane.XZ.offset(33)):
        with BuildLine():
            ThreePointArc((-5.69120253, -10.5645735249), (-3.8802280805, -11.3553436779), (-1.9640308484, -11.838183257))
            ThreePointArc((-1.9640308484, -11.838183257), (-3.2412535928, -9.4854085197), (-5.69120253, -10.5645735249))
        make_face()
    extrude(amount=-F22_DEPTH, mode=Mode.SUBTRACT)


with BuildPart() as f24:
    # F23 (on face) → F24 (new body)
    with BuildSketch(Plane.XZ.offset(12)):
        with BuildLine():
            ThreePointArc((29.8785366044, 10.7458675016), (28.8182674664, 11.7398437475), (28.7108556093, 13.1891960564))
            ThreePointArc((28.7108556093, 13.1891960564), (14.4871210247, -1.3300751794), (33.7441280678, -7.8332699709))
            ThreePointArc((33.7441280678, -7.8332699709), (33.1835017989, -6.492427844), (33.6786464482, -5.1260489805))
            ThreePointArc((33.6786464482, -5.1260489805), (35.8824375063, 3.7924664409), (29.8785366044, 10.7458675016))
        make_face()
        with Locations((22.1330061871, -2.9862548629)):
            Circle(F23_R, mode=Mode.SUBTRACT)
        with BuildLine():
            Line((22.157293651, 0.9640384317), (22.157293651, 1.9640384317))
            Line((22.157293651, 1.9640384317), (24.2208019779, 1.9640384317))
            ThreePointArc((24.2208019779, 1.9640384317), (26.157293651, 3.4640384317), (28.0937853241, 1.9640384317))
            Line((28.0937853241, 1.9640384317), (30.157293651, 1.9640384317))
            Line((30.157293651, 1.9640384317), (30.157293651, 0.9640384317))
            Line((30.157293651, 0.9640384317), (28.0937853241, 0.9640384317))
            ThreePointArc((28.0937853241, 0.9640384317), (26.157293651, -0.5359615683), (24.2208019779, 0.9640384317))
            Line((24.2208019779, 0.9640384317), (22.157293651, 0.9640384317))
        make_face(mode=Mode.SUBTRACT)
    extrude(amount=F24_DEPTH)


solid = Compound([f1.part, f3.part, f5.part, f7.part, f10.part, f12.part, f14.part, f16.part, f18.part, f24.part])
